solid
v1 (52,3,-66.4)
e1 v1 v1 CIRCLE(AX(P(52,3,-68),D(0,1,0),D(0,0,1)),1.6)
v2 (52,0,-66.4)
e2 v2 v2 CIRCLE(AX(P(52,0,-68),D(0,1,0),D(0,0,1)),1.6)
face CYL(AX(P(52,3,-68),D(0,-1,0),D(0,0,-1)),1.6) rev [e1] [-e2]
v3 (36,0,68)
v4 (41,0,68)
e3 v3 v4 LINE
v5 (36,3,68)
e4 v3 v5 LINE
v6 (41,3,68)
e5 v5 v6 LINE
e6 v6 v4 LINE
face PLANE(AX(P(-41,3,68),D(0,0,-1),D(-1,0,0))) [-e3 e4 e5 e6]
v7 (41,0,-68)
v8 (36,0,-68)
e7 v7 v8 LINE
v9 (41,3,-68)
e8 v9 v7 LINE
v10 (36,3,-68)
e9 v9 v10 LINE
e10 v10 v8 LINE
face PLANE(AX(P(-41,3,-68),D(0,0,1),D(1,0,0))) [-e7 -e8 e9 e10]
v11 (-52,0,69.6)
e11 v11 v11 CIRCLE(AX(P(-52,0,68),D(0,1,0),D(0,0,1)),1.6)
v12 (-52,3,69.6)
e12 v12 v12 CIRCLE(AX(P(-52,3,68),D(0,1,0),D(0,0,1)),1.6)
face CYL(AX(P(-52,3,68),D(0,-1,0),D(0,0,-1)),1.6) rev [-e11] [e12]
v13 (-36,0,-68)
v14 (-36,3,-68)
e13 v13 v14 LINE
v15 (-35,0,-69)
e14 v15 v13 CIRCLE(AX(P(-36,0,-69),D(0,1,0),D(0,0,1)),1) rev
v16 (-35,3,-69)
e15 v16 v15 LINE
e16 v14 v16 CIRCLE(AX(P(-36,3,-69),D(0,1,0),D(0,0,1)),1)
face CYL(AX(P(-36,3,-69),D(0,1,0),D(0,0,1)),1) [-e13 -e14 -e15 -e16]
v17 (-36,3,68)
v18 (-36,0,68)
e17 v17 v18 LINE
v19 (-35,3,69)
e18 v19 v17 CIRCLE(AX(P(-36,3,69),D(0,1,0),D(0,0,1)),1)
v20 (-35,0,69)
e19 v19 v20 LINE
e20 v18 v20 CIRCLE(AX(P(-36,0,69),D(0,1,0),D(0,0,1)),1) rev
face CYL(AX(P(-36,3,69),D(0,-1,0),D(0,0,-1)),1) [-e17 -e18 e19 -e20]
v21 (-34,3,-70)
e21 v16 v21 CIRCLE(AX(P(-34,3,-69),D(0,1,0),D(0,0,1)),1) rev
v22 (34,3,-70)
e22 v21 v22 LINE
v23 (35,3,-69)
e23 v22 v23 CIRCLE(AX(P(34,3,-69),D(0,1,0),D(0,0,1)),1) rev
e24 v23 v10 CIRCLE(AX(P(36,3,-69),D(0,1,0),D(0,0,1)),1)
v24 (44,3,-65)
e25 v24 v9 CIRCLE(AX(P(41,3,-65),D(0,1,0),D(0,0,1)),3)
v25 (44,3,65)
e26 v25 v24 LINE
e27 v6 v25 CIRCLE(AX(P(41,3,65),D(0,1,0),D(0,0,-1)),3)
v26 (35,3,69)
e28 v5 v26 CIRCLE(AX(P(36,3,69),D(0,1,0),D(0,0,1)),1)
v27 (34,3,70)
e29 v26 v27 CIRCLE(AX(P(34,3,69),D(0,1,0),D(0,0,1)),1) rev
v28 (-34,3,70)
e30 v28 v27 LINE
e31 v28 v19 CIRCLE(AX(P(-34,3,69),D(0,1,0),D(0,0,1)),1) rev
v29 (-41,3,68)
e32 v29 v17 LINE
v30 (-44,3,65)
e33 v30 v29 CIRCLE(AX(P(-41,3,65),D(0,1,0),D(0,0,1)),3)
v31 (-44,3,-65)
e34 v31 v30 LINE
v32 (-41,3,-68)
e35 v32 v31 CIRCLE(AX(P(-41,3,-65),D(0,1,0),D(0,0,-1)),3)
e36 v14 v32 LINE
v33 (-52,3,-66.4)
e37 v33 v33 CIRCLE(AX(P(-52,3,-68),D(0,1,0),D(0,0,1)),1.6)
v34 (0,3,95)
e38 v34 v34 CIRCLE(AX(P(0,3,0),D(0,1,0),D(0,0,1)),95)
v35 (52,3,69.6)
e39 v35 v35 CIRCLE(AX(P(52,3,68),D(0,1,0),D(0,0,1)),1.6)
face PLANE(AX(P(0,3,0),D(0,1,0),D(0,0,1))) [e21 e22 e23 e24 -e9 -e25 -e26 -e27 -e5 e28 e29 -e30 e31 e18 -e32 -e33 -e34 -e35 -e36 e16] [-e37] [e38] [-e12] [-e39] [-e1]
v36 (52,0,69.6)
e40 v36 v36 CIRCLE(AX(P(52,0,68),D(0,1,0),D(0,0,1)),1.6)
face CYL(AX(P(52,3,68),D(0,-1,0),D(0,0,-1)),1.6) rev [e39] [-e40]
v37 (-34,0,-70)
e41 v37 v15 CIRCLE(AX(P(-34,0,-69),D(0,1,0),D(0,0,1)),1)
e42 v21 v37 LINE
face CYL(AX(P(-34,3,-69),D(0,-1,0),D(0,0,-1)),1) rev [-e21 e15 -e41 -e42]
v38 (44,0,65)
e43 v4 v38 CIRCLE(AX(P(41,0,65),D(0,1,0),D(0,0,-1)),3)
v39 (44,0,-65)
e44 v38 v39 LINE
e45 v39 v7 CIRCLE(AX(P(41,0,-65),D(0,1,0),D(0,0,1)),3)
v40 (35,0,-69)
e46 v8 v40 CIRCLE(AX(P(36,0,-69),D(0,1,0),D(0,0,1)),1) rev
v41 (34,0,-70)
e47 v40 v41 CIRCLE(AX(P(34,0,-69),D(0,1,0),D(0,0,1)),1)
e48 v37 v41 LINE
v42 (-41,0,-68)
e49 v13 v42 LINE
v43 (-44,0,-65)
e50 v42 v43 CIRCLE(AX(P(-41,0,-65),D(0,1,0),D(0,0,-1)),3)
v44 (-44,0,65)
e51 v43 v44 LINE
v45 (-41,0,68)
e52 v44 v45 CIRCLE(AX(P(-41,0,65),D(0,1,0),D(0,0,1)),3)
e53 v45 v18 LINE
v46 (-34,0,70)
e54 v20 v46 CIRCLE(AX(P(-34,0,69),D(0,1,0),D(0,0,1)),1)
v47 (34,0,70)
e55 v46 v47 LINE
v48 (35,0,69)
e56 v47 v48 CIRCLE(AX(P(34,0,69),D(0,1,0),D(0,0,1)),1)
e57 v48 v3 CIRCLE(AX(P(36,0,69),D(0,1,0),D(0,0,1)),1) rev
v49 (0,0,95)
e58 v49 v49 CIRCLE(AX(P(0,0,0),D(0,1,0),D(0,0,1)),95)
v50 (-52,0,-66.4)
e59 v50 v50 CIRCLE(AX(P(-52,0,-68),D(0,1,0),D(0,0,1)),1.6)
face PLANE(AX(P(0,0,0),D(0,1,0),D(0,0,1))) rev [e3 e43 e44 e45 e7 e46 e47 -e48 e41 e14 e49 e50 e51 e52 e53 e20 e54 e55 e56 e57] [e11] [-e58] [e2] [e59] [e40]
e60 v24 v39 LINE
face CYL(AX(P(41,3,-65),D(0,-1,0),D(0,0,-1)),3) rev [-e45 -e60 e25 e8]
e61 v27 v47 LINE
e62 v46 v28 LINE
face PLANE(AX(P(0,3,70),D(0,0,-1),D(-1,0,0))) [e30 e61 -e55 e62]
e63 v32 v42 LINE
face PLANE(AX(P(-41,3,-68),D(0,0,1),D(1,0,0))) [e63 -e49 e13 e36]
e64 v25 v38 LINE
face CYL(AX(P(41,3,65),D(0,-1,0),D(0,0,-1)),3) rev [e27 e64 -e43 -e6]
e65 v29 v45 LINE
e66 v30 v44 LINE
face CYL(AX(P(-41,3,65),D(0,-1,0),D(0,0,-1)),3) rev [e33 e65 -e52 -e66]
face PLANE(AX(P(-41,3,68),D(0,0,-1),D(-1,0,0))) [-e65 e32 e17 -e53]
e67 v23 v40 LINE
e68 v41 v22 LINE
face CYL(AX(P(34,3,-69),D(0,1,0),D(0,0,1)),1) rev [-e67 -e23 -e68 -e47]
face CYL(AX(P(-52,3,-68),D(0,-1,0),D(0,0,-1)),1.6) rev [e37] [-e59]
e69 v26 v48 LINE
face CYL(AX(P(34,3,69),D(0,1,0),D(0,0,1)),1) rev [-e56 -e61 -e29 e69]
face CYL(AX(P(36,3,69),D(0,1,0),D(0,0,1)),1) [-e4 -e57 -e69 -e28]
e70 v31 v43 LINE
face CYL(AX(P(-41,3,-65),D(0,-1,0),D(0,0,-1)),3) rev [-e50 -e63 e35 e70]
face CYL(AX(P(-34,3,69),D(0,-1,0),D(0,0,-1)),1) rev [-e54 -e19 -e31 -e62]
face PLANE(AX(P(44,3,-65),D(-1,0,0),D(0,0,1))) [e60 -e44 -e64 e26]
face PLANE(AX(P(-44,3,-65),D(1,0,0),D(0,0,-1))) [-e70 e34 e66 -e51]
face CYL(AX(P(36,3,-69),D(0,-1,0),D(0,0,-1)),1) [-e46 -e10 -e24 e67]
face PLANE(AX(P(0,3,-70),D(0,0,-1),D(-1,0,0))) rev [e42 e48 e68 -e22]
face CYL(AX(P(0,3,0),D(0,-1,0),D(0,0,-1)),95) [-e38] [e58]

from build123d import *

# Parameters (mm, degrees)
SKIZZE1_R                       = 95
SKIZZE1_R_2                     = 1.6
AUFSATZ_LINEAR_AUSTRAGEN1_DEPTH = 3
SKIZZE2_W                       = 70
SKIZZE2_H                       = 4
SCHNITT_LINEAR_AUSTRAGEN2_DEPTH = 3
VERRUNDUNG1_R                   = 1


with BuildPart() as part:
    # Skizze1 → Aufsatz-Linear austragen1 (new body)
    with BuildSketch(Plane(origin=(0, 0, 0), x_dir=(1, 0, 0), z_dir=(0, 1, 0))):
        with Locations(Location((0, 0, 0), (0, 0, 270))):
            Circle(SKIZZE1_R)
        with Locations(Location((-52, 68, 0), (0, 0, 270))):
            Circle(SKIZZE1_R_2, mode=Mode.SUBTRACT)
        with Locations(Location((52, 68, 0), (0, 0, 270))):
            Circle(SKIZZE1_R_2, mode=Mode.SUBTRACT)
        with Locations(Location((-52, -68, 0), (0, 0, 270))):
            Circle(SKIZZE1_R_2, mode=Mode.SUBTRACT)
        with Locations(Location((52, -68, 0), (0, 0, 270))):
            Circle(SKIZZE1_R_2, mode=Mode.SUBTRACT)
        with BuildLine():
            Line((-44, 65), (-44, -65))
            ThreePointArc((-44, -65), (-43.121320344, -67.121320344), (-41, -68))
            Line((-41, -68), (41, -68))
            ThreePointArc((41, -68), (43.121320344, -67.121320344), (44, -65))
            Line((44, -65), (44, 65))
            ThreePointArc((44, 65), (43.121320344, 67.121320344), (41, 68))
            Line((41, 68), (-41, 68))
            ThreePointArc((-41, 68), (-43.121320344, 67.121320344), (-44, 65))
        make_face(mode=Mode.SUBTRACT)
    extrude(amount=AUFSATZ_LINEAR_AUSTRAGEN1_DEPTH)

    # Skizze2 → Schnitt-Linear austragen2 (cut)
    with BuildSketch(Plane(origin=(0, 0, 0), x_dir=(1, 0, 0), z_dir=(0, 1, 0))):
        with Locations((0, -68)):
            Rectangle(SKIZZE2_W, SKIZZE2_H)
        with Locations((0, 68)):
            Rectangle(SKIZZE2_W, SKIZZE2_H)
    extrude(amount=SCHNITT_LINEAR_AUSTRAGEN2_DEPTH, mode=Mode.SUBTRACT)

    # Verrundung1
    verrundung1_edges = [part.edges().sort_by_distance(p)[0] for p in [
        (-35, 1.5, 70),
        (35, 1.5, 70),
        (35, 1.5, -70),
        (-35, 1.5, -70),
    ]]
    fillet(verrundung1_edges, radius=VERRUNDUNG1_R)
    verrundung1_2_edges = [part.edges().sort_by_distance(p)[0] for p in [
        (-35, 1.5, 68),
        (35, 1.5, 68),
        (35, 1.5, -68),
        (-35, 1.5, -68),
    ]]
    fillet(verrundung1_2_edges, radius=VERRUNDUNG1_R - 0.0001)  # a hair under: the kernel refuses the full size


solid = part.part
